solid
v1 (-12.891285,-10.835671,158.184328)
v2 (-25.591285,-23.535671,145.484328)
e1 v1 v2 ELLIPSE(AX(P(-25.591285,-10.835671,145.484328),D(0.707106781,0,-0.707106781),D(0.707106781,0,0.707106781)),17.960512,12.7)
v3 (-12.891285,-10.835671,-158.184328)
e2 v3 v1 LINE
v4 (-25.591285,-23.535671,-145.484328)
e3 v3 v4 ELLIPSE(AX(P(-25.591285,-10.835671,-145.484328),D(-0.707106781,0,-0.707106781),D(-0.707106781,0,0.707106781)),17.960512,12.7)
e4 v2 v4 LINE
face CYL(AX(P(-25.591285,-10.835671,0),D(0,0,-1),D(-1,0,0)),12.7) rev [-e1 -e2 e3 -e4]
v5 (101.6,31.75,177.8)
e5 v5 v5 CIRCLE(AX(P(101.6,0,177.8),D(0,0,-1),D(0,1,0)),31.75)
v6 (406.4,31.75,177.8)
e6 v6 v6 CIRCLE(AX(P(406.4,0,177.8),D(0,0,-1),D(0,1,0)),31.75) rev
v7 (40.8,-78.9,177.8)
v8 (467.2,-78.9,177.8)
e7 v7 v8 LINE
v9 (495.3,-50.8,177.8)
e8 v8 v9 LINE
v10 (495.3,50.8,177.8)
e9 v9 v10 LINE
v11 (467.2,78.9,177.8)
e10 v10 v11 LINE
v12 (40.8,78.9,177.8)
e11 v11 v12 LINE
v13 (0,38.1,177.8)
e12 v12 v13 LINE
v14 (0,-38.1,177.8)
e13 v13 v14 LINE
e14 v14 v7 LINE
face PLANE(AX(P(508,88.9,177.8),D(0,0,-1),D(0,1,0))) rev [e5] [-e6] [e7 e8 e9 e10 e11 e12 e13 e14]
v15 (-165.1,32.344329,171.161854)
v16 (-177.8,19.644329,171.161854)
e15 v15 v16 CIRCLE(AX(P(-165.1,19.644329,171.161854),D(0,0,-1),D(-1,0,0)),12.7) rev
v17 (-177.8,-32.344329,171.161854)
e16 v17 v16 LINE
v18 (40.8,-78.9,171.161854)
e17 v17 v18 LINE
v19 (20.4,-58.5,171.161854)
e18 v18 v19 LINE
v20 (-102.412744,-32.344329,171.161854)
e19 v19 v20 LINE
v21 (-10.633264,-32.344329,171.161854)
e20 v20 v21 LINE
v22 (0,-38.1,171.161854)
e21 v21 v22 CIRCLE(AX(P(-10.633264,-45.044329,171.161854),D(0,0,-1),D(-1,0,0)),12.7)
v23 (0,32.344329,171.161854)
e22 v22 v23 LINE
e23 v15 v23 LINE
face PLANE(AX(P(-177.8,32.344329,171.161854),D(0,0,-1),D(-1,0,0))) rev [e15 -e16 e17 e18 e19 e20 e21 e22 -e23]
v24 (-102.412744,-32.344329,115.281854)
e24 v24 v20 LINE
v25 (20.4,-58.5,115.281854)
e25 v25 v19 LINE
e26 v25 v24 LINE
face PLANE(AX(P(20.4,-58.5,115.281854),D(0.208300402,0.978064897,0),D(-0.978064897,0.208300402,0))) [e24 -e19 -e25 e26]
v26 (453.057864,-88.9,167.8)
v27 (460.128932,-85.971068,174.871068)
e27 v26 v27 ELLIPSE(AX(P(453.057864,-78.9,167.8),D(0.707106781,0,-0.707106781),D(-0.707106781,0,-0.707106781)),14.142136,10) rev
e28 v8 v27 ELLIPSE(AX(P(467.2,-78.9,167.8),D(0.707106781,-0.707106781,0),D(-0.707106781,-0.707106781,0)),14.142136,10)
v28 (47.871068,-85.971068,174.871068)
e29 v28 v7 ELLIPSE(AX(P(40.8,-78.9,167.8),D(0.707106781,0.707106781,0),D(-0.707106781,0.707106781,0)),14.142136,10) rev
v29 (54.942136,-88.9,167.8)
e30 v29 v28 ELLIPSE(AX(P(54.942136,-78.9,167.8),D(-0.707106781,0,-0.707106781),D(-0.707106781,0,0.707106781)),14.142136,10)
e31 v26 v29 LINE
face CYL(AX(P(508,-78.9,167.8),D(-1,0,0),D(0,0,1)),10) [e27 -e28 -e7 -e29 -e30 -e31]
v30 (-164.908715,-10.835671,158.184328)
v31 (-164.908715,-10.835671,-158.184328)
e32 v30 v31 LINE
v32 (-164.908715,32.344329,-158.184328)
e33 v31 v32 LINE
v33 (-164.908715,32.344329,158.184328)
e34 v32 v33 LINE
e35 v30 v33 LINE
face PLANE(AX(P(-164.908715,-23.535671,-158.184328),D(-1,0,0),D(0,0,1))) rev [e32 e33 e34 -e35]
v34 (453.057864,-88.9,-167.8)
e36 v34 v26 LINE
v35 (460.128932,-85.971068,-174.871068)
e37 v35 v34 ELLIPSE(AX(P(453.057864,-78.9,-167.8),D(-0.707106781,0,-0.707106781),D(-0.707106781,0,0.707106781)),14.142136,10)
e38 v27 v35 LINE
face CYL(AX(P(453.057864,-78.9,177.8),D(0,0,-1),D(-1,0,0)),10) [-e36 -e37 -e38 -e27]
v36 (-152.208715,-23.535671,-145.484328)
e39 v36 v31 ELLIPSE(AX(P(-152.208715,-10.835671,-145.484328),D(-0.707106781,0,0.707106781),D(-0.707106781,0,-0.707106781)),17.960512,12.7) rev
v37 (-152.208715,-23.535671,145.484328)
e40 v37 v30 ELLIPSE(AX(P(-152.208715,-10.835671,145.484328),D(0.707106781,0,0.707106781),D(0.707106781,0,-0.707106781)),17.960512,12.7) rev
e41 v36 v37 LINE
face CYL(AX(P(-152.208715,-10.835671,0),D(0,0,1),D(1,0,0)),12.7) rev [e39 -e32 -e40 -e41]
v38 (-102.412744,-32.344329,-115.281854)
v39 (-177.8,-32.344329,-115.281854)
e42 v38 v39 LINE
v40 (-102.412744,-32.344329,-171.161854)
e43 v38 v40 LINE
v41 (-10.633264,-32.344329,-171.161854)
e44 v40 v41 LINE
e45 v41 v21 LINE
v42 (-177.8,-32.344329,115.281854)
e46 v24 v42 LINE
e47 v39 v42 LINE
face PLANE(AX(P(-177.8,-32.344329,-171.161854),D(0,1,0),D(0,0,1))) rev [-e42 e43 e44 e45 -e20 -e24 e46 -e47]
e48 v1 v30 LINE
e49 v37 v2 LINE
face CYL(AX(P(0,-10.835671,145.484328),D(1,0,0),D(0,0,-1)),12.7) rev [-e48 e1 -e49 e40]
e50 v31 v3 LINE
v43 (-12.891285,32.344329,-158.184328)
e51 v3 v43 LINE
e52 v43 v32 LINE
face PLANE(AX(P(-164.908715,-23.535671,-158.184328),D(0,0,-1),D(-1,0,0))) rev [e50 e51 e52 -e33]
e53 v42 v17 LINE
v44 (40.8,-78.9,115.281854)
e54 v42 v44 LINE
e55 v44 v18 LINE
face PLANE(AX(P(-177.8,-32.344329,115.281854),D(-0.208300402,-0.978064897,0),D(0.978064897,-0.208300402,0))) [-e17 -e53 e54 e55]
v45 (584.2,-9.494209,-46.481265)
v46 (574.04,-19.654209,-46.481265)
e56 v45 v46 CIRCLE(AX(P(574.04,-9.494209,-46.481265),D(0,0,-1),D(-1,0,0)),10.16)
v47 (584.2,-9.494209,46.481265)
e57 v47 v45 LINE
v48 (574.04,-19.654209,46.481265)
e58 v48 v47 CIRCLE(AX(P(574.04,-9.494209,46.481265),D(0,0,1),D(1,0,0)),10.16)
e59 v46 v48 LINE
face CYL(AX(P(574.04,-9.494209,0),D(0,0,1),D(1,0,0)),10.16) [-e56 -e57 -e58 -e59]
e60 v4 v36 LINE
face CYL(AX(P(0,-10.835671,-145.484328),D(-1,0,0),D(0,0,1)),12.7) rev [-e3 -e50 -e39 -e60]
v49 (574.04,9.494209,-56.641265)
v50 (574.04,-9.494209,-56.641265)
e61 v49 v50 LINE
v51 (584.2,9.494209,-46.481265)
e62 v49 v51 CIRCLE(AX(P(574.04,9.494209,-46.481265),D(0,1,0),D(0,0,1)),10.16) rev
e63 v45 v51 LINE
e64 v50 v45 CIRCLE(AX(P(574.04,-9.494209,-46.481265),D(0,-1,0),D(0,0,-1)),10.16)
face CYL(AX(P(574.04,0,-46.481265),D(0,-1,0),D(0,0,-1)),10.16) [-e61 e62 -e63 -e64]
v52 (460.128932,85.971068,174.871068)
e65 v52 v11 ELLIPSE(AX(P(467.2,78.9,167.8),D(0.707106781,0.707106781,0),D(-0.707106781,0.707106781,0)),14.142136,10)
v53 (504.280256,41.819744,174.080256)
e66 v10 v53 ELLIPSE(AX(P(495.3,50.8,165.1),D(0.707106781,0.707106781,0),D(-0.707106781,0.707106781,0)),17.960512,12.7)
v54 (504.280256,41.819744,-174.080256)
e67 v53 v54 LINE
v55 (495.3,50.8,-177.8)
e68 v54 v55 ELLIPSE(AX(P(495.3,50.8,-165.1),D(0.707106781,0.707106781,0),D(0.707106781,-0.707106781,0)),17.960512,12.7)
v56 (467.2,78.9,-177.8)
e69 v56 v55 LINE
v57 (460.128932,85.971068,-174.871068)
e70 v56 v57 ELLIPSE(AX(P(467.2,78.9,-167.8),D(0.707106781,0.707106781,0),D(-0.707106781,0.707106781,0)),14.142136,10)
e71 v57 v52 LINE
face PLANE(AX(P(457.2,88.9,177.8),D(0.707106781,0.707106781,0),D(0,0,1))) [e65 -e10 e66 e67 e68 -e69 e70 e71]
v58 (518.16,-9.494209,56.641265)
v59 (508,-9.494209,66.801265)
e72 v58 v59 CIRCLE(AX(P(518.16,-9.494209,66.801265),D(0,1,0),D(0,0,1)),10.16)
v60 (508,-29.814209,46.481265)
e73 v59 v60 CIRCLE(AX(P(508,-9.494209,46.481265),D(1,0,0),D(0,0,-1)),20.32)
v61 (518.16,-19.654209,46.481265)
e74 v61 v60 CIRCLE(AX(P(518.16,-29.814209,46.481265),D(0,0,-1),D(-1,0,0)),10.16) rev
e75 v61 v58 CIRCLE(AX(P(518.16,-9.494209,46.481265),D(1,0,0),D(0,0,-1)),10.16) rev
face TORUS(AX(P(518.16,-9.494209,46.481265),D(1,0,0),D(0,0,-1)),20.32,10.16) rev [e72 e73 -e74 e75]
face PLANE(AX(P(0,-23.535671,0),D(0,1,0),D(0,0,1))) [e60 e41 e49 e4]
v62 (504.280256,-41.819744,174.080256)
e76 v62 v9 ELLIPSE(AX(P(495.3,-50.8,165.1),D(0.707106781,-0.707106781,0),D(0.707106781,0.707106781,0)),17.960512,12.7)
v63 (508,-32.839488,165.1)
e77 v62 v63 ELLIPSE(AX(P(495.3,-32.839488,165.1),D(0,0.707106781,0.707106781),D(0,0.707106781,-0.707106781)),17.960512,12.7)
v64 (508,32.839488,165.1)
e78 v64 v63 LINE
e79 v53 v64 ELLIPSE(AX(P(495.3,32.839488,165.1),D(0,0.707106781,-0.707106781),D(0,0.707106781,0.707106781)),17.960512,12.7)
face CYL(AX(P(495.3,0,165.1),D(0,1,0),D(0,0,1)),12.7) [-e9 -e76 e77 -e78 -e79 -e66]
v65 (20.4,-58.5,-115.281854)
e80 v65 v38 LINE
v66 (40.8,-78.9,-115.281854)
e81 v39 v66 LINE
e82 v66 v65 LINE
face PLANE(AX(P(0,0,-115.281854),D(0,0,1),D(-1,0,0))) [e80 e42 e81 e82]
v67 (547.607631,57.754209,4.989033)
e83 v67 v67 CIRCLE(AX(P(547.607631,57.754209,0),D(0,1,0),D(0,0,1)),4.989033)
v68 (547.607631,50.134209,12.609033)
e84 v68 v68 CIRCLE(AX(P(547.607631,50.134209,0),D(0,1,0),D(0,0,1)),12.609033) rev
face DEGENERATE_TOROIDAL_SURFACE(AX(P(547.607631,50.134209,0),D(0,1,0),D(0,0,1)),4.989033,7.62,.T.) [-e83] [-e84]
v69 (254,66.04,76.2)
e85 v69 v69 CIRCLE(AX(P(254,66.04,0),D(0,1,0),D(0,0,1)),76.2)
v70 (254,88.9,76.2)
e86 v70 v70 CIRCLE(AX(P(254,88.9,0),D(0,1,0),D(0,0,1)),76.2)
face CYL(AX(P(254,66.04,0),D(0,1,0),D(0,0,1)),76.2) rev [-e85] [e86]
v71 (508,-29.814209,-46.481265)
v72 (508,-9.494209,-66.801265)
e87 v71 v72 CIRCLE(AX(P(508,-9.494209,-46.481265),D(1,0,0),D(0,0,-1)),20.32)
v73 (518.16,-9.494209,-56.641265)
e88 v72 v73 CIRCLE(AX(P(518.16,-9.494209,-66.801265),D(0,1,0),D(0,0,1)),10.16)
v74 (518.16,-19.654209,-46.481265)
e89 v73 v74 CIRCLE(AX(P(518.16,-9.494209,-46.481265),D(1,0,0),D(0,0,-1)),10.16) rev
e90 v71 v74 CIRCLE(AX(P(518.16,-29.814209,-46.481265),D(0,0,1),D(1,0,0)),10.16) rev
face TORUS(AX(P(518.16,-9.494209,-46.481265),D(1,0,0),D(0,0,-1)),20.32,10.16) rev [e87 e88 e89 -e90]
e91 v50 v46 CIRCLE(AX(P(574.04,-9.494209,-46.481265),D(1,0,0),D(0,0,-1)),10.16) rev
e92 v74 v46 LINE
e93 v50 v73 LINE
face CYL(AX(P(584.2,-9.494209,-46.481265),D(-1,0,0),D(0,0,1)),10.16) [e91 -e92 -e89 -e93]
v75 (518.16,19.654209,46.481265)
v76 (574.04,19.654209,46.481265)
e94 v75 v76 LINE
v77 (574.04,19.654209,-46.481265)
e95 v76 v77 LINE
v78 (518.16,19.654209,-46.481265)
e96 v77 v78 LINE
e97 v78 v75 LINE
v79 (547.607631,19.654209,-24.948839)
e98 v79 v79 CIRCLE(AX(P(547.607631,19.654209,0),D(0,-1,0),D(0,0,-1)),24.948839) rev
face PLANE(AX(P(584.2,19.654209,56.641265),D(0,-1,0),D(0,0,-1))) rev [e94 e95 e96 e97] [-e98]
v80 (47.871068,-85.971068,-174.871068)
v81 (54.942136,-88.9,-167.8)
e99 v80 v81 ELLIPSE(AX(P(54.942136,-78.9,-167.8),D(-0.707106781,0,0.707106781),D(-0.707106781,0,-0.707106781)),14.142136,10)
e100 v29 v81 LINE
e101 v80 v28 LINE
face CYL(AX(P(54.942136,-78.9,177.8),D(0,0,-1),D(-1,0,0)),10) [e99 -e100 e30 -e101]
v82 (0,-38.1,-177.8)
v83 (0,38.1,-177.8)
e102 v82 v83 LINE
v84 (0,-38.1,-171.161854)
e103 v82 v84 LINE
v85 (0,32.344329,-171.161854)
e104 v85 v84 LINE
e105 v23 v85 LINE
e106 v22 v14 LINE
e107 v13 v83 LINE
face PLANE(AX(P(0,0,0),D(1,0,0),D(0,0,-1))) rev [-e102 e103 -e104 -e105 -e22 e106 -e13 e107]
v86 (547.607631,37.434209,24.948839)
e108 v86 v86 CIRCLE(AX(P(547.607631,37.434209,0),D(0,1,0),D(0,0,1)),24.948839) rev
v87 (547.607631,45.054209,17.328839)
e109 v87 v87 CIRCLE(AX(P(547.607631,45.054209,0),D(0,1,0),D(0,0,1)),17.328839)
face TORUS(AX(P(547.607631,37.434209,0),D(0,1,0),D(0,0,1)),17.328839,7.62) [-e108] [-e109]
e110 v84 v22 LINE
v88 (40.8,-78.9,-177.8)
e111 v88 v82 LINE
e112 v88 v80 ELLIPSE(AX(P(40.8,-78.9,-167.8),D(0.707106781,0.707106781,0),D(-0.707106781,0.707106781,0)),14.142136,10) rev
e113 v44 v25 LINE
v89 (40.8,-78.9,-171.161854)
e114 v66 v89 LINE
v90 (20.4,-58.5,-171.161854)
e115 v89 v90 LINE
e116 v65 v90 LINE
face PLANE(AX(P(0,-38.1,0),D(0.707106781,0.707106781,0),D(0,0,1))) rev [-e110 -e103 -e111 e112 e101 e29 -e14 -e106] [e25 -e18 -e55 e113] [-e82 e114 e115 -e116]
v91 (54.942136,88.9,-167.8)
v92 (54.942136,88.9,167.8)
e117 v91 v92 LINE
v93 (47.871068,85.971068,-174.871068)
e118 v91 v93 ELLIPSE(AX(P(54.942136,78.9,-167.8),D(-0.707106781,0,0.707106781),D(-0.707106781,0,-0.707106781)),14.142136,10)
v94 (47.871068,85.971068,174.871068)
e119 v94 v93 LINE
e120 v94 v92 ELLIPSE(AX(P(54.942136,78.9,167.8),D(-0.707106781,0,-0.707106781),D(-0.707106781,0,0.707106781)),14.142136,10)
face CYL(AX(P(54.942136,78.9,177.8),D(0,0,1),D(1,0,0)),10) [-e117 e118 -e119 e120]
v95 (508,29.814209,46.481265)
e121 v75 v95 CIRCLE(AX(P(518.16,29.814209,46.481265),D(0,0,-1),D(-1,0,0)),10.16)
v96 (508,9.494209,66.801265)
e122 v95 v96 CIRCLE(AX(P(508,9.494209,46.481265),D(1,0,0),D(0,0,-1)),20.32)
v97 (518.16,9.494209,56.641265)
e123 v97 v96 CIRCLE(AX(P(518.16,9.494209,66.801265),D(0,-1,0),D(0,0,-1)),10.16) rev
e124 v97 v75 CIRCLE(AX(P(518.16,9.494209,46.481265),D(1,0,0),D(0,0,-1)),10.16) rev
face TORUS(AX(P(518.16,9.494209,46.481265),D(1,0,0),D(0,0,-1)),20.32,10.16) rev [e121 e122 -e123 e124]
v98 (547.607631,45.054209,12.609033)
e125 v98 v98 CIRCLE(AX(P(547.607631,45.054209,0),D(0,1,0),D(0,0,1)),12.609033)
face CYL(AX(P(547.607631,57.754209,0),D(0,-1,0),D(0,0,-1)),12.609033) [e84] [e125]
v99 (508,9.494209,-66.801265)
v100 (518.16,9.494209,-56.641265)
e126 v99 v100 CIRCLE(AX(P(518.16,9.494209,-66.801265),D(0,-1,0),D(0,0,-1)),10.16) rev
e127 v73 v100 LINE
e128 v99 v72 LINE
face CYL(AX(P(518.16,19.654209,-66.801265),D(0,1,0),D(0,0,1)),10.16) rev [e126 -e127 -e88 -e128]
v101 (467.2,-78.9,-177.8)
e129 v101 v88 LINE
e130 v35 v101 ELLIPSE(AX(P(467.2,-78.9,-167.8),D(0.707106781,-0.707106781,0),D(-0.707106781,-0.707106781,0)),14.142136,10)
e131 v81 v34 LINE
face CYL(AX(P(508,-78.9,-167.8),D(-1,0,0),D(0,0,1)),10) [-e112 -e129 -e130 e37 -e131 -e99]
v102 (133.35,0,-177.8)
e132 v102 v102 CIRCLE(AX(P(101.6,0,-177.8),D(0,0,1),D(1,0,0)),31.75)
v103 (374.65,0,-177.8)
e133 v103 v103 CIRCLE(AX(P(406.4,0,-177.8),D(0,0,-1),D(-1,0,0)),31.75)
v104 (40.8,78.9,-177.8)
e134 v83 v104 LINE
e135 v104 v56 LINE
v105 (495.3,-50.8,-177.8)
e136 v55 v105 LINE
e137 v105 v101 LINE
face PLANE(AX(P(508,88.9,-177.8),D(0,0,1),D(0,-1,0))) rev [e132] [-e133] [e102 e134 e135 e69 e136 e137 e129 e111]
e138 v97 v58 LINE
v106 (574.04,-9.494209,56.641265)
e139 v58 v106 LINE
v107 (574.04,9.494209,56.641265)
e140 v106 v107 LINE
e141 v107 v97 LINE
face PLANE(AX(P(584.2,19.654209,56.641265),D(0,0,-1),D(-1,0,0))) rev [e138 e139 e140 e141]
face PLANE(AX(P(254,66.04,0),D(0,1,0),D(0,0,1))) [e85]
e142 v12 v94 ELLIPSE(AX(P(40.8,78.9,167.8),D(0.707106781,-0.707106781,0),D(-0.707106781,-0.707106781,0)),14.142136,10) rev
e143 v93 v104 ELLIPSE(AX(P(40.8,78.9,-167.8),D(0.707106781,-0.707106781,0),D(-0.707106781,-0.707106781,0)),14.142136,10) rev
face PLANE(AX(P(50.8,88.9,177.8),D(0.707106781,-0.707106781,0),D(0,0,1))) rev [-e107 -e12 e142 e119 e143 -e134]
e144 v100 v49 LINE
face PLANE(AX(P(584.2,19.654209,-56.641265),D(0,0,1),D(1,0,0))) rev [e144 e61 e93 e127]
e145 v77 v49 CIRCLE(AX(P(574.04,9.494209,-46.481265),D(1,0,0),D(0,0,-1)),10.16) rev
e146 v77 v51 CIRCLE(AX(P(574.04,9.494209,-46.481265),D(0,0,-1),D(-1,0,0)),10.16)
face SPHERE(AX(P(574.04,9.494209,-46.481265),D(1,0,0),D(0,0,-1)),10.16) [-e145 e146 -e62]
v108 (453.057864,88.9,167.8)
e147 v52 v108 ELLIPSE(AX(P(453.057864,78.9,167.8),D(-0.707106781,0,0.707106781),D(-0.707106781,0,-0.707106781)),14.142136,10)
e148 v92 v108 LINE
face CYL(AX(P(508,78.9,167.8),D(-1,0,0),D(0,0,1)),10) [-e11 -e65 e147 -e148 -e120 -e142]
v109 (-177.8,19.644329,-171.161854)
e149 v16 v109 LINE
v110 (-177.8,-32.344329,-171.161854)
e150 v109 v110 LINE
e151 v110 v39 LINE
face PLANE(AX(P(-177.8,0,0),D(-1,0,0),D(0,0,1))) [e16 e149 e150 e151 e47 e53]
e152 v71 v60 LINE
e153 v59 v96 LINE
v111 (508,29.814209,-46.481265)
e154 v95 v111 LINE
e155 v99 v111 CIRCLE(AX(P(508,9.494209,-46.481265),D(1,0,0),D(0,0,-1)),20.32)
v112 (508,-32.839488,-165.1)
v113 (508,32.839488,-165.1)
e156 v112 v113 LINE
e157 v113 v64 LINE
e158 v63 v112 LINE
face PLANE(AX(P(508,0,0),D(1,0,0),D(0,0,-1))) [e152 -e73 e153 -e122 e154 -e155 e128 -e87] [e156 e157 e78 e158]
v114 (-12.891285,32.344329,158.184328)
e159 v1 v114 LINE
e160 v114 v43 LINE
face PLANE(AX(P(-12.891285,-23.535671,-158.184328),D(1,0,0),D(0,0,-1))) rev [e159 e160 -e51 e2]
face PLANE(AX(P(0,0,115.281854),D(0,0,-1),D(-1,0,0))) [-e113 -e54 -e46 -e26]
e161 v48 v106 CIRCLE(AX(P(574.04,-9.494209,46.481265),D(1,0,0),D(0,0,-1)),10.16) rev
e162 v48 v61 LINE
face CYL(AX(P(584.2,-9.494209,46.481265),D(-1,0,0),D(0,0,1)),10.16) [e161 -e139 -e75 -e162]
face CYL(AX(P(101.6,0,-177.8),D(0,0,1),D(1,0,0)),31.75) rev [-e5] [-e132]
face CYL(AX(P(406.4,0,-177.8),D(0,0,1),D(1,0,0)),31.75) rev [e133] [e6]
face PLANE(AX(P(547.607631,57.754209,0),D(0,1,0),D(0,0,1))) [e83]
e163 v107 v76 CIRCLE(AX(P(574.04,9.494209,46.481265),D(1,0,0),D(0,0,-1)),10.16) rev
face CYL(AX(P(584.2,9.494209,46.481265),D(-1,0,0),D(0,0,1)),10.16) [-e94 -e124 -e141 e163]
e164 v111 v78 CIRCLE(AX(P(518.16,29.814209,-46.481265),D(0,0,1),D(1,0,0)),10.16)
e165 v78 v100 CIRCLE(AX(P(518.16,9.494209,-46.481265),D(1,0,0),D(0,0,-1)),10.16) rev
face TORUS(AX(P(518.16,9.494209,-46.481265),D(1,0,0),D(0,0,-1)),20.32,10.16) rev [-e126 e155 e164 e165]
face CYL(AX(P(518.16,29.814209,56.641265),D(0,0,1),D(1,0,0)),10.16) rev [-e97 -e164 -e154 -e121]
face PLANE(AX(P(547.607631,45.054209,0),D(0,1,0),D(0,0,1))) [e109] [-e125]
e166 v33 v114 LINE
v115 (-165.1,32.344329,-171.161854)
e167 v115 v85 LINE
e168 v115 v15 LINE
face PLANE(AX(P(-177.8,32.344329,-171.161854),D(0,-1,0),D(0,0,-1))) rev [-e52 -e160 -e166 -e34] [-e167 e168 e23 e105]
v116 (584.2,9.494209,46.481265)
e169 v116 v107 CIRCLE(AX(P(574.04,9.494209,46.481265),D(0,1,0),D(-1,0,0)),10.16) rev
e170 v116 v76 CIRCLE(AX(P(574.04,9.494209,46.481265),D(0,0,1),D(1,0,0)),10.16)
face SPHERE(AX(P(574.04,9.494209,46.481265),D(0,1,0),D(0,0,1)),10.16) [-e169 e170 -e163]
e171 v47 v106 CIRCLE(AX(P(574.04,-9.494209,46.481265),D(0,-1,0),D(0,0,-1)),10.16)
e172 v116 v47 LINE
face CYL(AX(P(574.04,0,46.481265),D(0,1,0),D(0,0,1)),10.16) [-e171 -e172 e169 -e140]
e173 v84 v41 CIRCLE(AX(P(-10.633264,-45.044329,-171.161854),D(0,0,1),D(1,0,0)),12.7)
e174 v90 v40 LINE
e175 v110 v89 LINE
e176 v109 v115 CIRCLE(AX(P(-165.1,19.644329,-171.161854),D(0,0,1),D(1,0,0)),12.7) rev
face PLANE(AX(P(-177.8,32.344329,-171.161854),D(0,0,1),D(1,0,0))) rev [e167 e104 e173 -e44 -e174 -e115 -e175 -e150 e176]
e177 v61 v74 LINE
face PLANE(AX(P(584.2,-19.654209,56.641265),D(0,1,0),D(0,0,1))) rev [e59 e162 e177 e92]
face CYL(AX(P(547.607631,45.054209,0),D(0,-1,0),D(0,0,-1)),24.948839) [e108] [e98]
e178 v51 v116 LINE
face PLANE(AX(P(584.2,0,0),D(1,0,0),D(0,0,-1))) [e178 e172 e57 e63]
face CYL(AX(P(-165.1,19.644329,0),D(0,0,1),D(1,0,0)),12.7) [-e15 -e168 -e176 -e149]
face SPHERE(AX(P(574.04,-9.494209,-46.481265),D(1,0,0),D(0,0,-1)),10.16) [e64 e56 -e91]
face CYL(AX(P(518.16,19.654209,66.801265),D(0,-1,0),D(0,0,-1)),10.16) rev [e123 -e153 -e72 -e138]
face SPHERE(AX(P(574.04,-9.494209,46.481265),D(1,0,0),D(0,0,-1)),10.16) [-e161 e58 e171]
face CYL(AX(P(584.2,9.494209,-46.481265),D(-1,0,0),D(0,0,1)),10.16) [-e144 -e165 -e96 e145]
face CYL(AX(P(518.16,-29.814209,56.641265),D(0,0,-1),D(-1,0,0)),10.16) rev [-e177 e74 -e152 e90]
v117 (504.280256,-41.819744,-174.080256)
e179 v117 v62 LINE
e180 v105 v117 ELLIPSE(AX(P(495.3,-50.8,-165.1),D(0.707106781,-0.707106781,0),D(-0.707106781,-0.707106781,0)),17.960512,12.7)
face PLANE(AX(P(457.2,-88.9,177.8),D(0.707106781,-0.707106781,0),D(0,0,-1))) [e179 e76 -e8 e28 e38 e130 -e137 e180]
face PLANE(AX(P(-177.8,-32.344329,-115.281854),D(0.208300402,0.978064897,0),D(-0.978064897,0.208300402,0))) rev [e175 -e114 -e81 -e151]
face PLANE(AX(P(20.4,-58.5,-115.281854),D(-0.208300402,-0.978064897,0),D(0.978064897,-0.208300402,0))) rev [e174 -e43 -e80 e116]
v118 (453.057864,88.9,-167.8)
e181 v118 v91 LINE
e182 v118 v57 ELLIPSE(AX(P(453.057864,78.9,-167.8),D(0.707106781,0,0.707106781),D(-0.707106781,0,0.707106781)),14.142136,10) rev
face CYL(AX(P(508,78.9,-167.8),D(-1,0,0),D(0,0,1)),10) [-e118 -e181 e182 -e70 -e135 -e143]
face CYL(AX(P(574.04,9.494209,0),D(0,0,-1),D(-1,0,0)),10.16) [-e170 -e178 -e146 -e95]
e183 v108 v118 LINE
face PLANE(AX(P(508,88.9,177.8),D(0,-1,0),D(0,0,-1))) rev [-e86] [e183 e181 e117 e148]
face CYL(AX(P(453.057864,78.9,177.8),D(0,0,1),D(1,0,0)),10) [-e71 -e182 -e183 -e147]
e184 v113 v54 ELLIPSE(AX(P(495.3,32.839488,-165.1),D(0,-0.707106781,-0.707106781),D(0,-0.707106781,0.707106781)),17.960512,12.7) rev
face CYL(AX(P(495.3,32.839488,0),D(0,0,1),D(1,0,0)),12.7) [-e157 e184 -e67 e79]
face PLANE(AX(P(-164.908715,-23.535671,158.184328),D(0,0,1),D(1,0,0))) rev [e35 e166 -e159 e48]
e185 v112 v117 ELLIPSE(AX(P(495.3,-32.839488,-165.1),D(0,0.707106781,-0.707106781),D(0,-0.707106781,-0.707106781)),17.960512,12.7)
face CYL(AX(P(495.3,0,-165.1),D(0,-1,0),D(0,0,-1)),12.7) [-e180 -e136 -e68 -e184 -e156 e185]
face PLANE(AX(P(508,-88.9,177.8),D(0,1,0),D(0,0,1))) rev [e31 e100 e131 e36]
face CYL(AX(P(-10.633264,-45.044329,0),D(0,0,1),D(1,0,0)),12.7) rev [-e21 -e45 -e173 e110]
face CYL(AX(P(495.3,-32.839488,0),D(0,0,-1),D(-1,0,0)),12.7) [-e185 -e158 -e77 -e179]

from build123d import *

# Parameters (mm, degrees)
SKETCH3_W           = 355.6
SKETCH3_H           = 177.8
BOSS_EXTRUDE1_DEPTH = 508
SKETCH4_R           = 31.75
CUT_EXTRUDE1_DEPTH  = 627.433212721
CHAMFER1_START      = -64
CHAMFER1_OUTLINE_W  = 75
CHAMFER1_OUTLINE_H  = 358
CHAMFER1_DEPTH      = 37.059231637
CHAMFER2_START      = -64
CHAMFER2_OUTLINE_W  = 75
CHAMFER2_OUTLINE_H  = 358
CHAMFER2_DEPTH      = 37.059231637
CHAMFER3_START      = 386.151013206
CHAMFER3_OUTLINE_W  = 75
CHAMFER3_OUTLINE_H  = 358
CHAMFER3_DEPTH      = 36.848986794
CHAMFER4_START      = 386.151013206
CHAMFER4_OUTLINE_W  = 75
CHAMFER4_OUTLINE_H  = 358
CHAMFER4_DEPTH      = 36.848986794
FILLET1_R           = 10
SKETCH5_R           = 76.2
CUT_EXTRUDE2_DEPTH  = 22.86
SKETCH7_W           = 342.323707946
SKETCH7_H           = 64.688657288
BOSS_EXTRUDE3_DEPTH = 177.8
SKETCH8_W           = 152.017430594
SKETCH8_H           = 316.368655432
CUT_EXTRUDE3_DEPTH  = 55.88
BOSS_EXTRUDE5_DEPTH = 55.88
SKETCH11_W          = 113.282529032
SKETCH11_H          = 39.308418544
BOSS_EXTRUDE6_DEPTH = 76.2
FILLET2_R           = 10.16
FILLET3_R           = 12.7
FILLET4_R           = 12.7
FILLET5_R           = 12.7
SKETCH12_R          = 24.948838793
BOSS_EXTRUDE7_DEPTH = 25.4
FILLET6_R           = 7.62
SKETCH13_R          = 12.609032653
BOSS_EXTRUDE8_DEPTH = 12.7
FILLET7_R           = 7.62


with BuildPart() as part:
    # Sketch3 → Boss-Extrude1 (new body)
    with BuildSketch(Plane(origin=(0, 0, 0), x_dir=(0, 0, -1), z_dir=(1, 0, 0))):
        Rectangle(SKETCH3_W, SKETCH3_H)
    extrude(amount=BOSS_EXTRUDE1_DEPTH)

    # Sketch4 → Cut-Extrude1 (cut, symmetric)
    with BuildSketch(Plane.XY.offset(177.8)):
        with Locations((101.6, 0)):
            Circle(SKETCH4_R)
    cut_extrude1 = extrude(amount=CUT_EXTRUDE1_DEPTH, both=True, mode=Mode.SUBTRACT)

    # Mirror1: Cut-Extrude1 across plane
    add(cut_extrude1.mirror(Plane.ZY.offset(-254)), mode=Mode.SUBTRACT)

    # Chamfer1: read off the stored shape, not the designer's step
    # Chamfer1 outline → Chamfer1 (cut)
    with BuildSketch(Plane(origin=(0, 0, 0), x_dir=(0.7071067811865471, 0.707106781186548, 0), z_dir=(0.707106781186548, -0.707106781186547, 0)).offset(CHAMFER1_START)):
        with Locations((62.5, 0)):
            Rectangle(CHAMFER1_OUTLINE_W, CHAMFER1_OUTLINE_H)
    extrude(amount=CHAMFER1_DEPTH, mode=Mode.SUBTRACT)

    # Chamfer2: read off the stored shape, not the designer's step
    # Chamfer2 outline → Chamfer2 (cut)
    with BuildSketch(Plane(origin=(0, 0, 0), x_dir=(0.707106781186548, -0.707106781186547, 0), z_dir=(0.707106781186547, 0.707106781186548, 0)).offset(CHAMFER2_START)):
        with Locations((62.5, 0)):
            Rectangle(CHAMFER2_OUTLINE_W, CHAMFER2_OUTLINE_H)
    extrude(amount=CHAMFER2_DEPTH, mode=Mode.SUBTRACT)

    # Chamfer3: read off the stored shape, not the designer's step
    # Chamfer3 outline → Chamfer3 (cut)
    with BuildSketch(Plane(origin=(0, 0, 0), x_dir=(0.707106781186548, -0.707106781186547, 0), z_dir=(0.707106781186547, 0.707106781186548, 0)).offset(CHAMFER3_START)):
        with Locations((296.5, 0)):
            Rectangle(CHAMFER3_OUTLINE_W, CHAMFER3_OUTLINE_H)
    extrude(amount=CHAMFER3_DEPTH, mode=Mode.SUBTRACT)

    # Chamfer4: read off the stored shape, not the designer's step
    # Chamfer4 outline → Chamfer4 (cut)
    with BuildSketch(Plane(origin=(0, 0, 0), x_dir=(0.707106781186548, 0.707106781186547, 0), z_dir=(0.707106781186547, -0.707106781186548, 0)).offset(CHAMFER4_START)):
        with Locations((296.5, 0)):
            Rectangle(CHAMFER4_OUTLINE_W, CHAMFER4_OUTLINE_H)
    extrude(amount=CHAMFER4_DEPTH, mode=Mode.SUBTRACT)

    # Fillet1
    fillet1_edges = [part.edges().sort_by_distance(p)[0] for p in [
        (50.8, 88.9, 0),
        (50.8, -88.9, 0),
        (254, 88.9, -177.8),
        (254, 88.9, 177.8),
        (457.2, 88.9, 0),
        (254, -88.9, 177.8),
        (254, -88.9, -177.8),
        (457.2, -88.9, 0),
    ]]
    fillet(fillet1_edges, radius=FILLET1_R)

    # Sketch5 → Cut-Extrude2 (cut)
    with BuildSketch(Plane(origin=(0, 88.9, 0), x_dir=(1, 0, 0), z_dir=(0, 1, 0))):
        with Locations(Location((254, 0, 0), (0, 0, 270))):
            Circle(SKETCH5_R)
    extrude(amount=-CUT_EXTRUDE2_DEPTH, mode=Mode.SUBTRACT)

    # Sketch7 → Boss-Extrude3 (add)
    with BuildSketch(Plane.ZY):
        Rectangle(SKETCH7_W, SKETCH7_H)
    extrude(amount=BOSS_EXTRUDE3_DEPTH)

    # Sketch8 → Cut-Extrude3 (cut)
    with BuildSketch(Plane(origin=(0, 32.344328644, 0), x_dir=(1, 0, 0), z_dir=(0, 1, 0))):
        with Locations((-88.9, 0)):
            Rectangle(SKETCH8_W, SKETCH8_H)
    extrude(amount=-CUT_EXTRUDE3_DEPTH, mode=Mode.SUBTRACT)

    # Sketch10 → Boss-Extrude5 (add)
    with BuildSketch(Plane.XY.offset(171.161853973)):
        Polygon((-177.8, -32.344328644), (40.8, -78.9), (20.4, -58.5), (-102.412744224, -32.344328644), align=None)
    boss_extrude5 = extrude(amount=-BOSS_EXTRUDE5_DEPTH)

    # Mirror2: Boss-Extrude5 across plane
    add(boss_extrude5.mirror(Plane.XY))

    # Sketch11 → Boss-Extrude6 (add)
    with BuildSketch(Plane(origin=(508, 0, 0), x_dir=(0, 0, -1), z_dir=(1, 0, 0))):
        Rectangle(SKETCH11_W, SKETCH11_H)
    extrude(amount=BOSS_EXTRUDE6_DEPTH)

    # Fillet2
    fillet2_edges = [part.edges().sort_by_distance(p)[0] for p in [
        (508, 0, -56.641264516),
        (546.1, -19.654209272, -56.641264516),
        (508, 19.654209272, 0),
        (546.1, 19.654209272, -56.641264516),
        (508, 0, 56.641264516),
        (546.1, 19.654209272, 56.641264516),
        (508, -19.654209272, 0),
        (546.1, -19.654209272, 56.641264516),
        (584.2, 0, -56.641264516),
        (584.2, 19.654209272, 0),
        (584.2, 0, 56.641264516),
        (584.2, -19.654209272, 0),
    ]]
    fillet(fillet2_edges, radius=FILLET2_R)

    # Fillet3
    fillet3_edges = [part.edges().sort_by_distance(p)[0] for p in [
        (508, 0, 177.8),
        (508, 38.1, 0),
        (508, 0, -177.8),
        (508, -38.1, 0),
    ]]
    fillet(fillet3_edges, radius=FILLET3_R)

    # Fillet4
    # the kernel refuses this fillet: 12.7 mm, written as the material it adds along each edge
    with BuildSketch(Plane(origin=(0, -32.344328644, 171.161853973), x_dir=(-1.269692375710673e-12, -1.0, 0), z_dir=(0, 0, -1))) as fillet4_piece_1:
        with BuildLine():
            CenterArc((12.7, 10.63326383), FILLET4_R, 180, 56.852413593)
            Line((0, 10.63326383), (-0.254, 10.63326383))
            Line((-0.254, 10.63326383), (-0.254, 0))
            Line((-0.254, 0), (0, -0.254))
            ThreePointArc((0, -0.254), (2.877835678, -0.254), (5.616784783, -0.212665277))
            Line((5.616784783, -0.212665277), (5.755671356, 0))
        make_face()
    extrude(amount=342.323707946)
    with BuildSketch(Plane(origin=(-12.891284703, -23.535671356, -158.184327716), x_dir=(0, 1, 0), z_dir=(0, 0, 1)), Plane(origin=(-164.908715297, -23.535671356, 158.184327716), x_dir=(0, 1, 0), z_dir=(0, 0, -1))) as fillet4_piece_2:
        with BuildLine():
            CenterArc((FILLET4_R, FILLET4_R), FILLET4_R, 180, 90)
            Line((0, FILLET4_R), (-FILLET4_R * 0.02, FILLET4_R))
            Line((-FILLET4_R * 0.02, FILLET4_R), (-FILLET4_R * 0.02, -FILLET4_R * 0.02))
            Line((-FILLET4_R * 0.02, -FILLET4_R * 0.02), (FILLET4_R, -FILLET4_R * 0.02))
            Line((FILLET4_R, -FILLET4_R * 0.02), (FILLET4_R, 0))
        make_face()
    extrude(amount=316.368655432)
    with BuildSketch(Plane(origin=(18.858715297, -23.535671356, 158.184327716), x_dir=(0, 1, 0), z_dir=(-1, 0, 0)), Plane(origin=(-164.908715297, -23.535671356, -158.184327716), x_dir=(0, 1, 0), z_dir=(1, 0, 0))) as fillet4_piece_3:
        with BuildLine():
            CenterArc((FILLET4_R, FILLET4_R), FILLET4_R, 180, 90)
            Line((0, FILLET4_R), (-FILLET4_R * 0.02, FILLET4_R))
            Line((-FILLET4_R * 0.02, FILLET4_R), (-FILLET4_R * 0.02, -FILLET4_R * 0.02))
            Line((-FILLET4_R * 0.02, -FILLET4_R * 0.02), (FILLET4_R, -FILLET4_R * 0.02))
            Line((FILLET4_R, -FILLET4_R * 0.02), (FILLET4_R, 0))
        make_face()
    extrude(amount=183.767430594)
    with BuildSketch(Plane(origin=(-164.908715297, -23.535671356, 189.934327716), x_dir=(0, 1, 0), z_dir=(0, 0, -1))) as fillet4_piece_4a_section:
        with BuildLine():
            CenterArc((FILLET4_R, FILLET4_R), FILLET4_R, 180, 90)
            Line((0, FILLET4_R), (-FILLET4_R * 0.02, FILLET4_R))
            Line((-FILLET4_R * 0.02, FILLET4_R), (-FILLET4_R * 0.02, -FILLET4_R * 0.02))
            Line((-FILLET4_R * 0.02, -FILLET4_R * 0.02), (FILLET4_R, -FILLET4_R * 0.02))
            Line((FILLET4_R, -FILLET4_R * 0.02), (FILLET4_R, 0))
        make_face()
    fillet4_piece_4a = extrude(amount=348.118655432, mode=Mode.PRIVATE)
    fillet4_piece_4a = split(fillet4_piece_4a, bisect_by=Plane(origin=(-164.908715297, -23.535671356, 158.184327716), z_dir=(0, 0, 1)), keep=Keep.TOP, mode=Mode.PRIVATE)
    with BuildSketch(Plane(origin=(-12.891284703, -23.535671356, 158.184327716), x_dir=(0, 1, 0), z_dir=(-1, 0, 0))) as fillet4_piece_4b_section:
        with BuildLine():
            CenterArc((FILLET4_R, FILLET4_R), FILLET4_R, 180, 90)
            Line((0, FILLET4_R), (-FILLET4_R * 0.02, FILLET4_R))
            Line((-FILLET4_R * 0.02, FILLET4_R), (-FILLET4_R * 0.02, -FILLET4_R * 0.02))
            Line((-FILLET4_R * 0.02, -FILLET4_R * 0.02), (FILLET4_R, -FILLET4_R * 0.02))
            Line((FILLET4_R, -FILLET4_R * 0.02), (FILLET4_R, 0))
        make_face()
    fillet4_piece_4b = extrude(amount=183.767430594, mode=Mode.PRIVATE)
    fillet4_piece_4b = split(fillet4_piece_4b, bisect_by=Plane(origin=(-164.908715297, -23.535671356, 158.184327716), z_dir=(-1, 0, 0)), keep=Keep.TOP, mode=Mode.PRIVATE)
    fillet4_piece_4 = fillet4_piece_4a & fillet4_piece_4b
    add(fillet4_piece_4)
    with BuildSketch(Plane(origin=(-164.908715297, -23.535671356, 158.184327716), x_dir=(0, 1, 0), z_dir=(0, 0, -1))) as fillet4_piece_5a_section:
        with BuildLine():
            CenterArc((FILLET4_R, FILLET4_R), FILLET4_R, 180, 90)
            Line((0, FILLET4_R), (-FILLET4_R * 0.02, FILLET4_R))
            Line((-FILLET4_R * 0.02, FILLET4_R), (-FILLET4_R * 0.02, -FILLET4_R * 0.02))
            Line((-FILLET4_R * 0.02, -FILLET4_R * 0.02), (FILLET4_R, -FILLET4_R * 0.02))
            Line((FILLET4_R, -FILLET4_R * 0.02), (FILLET4_R, 0))
        make_face()
    fillet4_piece_5a = extrude(amount=348.118655432, mode=Mode.PRIVATE)
    fillet4_piece_5a = split(fillet4_piece_5a, bisect_by=Plane(origin=(-164.908715297, -23.535671356, -158.184327716), z_dir=(0, 0, -1)), keep=Keep.TOP, mode=Mode.PRIVATE)
    with BuildSketch(Plane(origin=(-196.658715297, -23.535671356, -158.184327716), x_dir=(0, 1, 0), z_dir=(1, 0, 0))) as fillet4_piece_5b_section:
        with BuildLine():
            CenterArc((FILLET4_R, FILLET4_R), FILLET4_R, 180, 90)
            Line((0, FILLET4_R), (-FILLET4_R * 0.02, FILLET4_R))
            Line((-FILLET4_R * 0.02, FILLET4_R), (-FILLET4_R * 0.02, -FILLET4_R * 0.02))
            Line((-FILLET4_R * 0.02, -FILLET4_R * 0.02), (FILLET4_R, -FILLET4_R * 0.02))
            Line((FILLET4_R, -FILLET4_R * 0.02), (FILLET4_R, 0))
        make_face()
    fillet4_piece_5b = extrude(amount=183.767430594, mode=Mode.PRIVATE)
    fillet4_piece_5b = split(fillet4_piece_5b, bisect_by=Plane(origin=(-164.908715297, -23.535671356, -158.184327716), z_dir=(-1, 0, 0)), keep=Keep.TOP, mode=Mode.PRIVATE)
    fillet4_piece_5 = fillet4_piece_5a & fillet4_piece_5b
    add(fillet4_piece_5)

    # Fillet5
    fillet5_edges = [part.edges().sort_by_distance(p)[0] for p in [
        (-177.8, 32.344328644, 0),
    ]]
    fillet(fillet5_edges, radius=FILLET5_R)

    # Sketch12 → Boss-Extrude7 (add)
    with BuildSketch(Plane(origin=(0, 19.654209272, 0), x_dir=(1, 0, 0), z_dir=(0, 1, 0))):
        with Locations(Location((547.607631205, 0, 0), (0, 0, 90))):
            Circle(SKETCH12_R)
    extrude(amount=BOSS_EXTRUDE7_DEPTH)

    # Fillet6
    fillet6_edges = [part.edges().sort_by_distance(p)[0] for p in [
        (547.607631205, 45.054209272, 24.948838793),
    ]]
    fillet(fillet6_edges, radius=FILLET6_R)

    # Sketch13 → Boss-Extrude8 (add)
    with BuildSketch(Plane(origin=(0, 45.054209272, 0), x_dir=(1, 0, 0), z_dir=(0, 1, 0))):
        with Locations(Location((547.607631205, 0, 0), (0, 0, 270))):
            Circle(SKETCH13_R)
    extrude(amount=BOSS_EXTRUDE8_DEPTH)

    # Fillet7
    fillet7_edges = [part.edges().sort_by_distance(p)[0] for p in [
        (547.607631205, 57.754209272, -12.609032653),
    ]]
    fillet(fillet7_edges, radius=FILLET7_R)


solid = part.part
